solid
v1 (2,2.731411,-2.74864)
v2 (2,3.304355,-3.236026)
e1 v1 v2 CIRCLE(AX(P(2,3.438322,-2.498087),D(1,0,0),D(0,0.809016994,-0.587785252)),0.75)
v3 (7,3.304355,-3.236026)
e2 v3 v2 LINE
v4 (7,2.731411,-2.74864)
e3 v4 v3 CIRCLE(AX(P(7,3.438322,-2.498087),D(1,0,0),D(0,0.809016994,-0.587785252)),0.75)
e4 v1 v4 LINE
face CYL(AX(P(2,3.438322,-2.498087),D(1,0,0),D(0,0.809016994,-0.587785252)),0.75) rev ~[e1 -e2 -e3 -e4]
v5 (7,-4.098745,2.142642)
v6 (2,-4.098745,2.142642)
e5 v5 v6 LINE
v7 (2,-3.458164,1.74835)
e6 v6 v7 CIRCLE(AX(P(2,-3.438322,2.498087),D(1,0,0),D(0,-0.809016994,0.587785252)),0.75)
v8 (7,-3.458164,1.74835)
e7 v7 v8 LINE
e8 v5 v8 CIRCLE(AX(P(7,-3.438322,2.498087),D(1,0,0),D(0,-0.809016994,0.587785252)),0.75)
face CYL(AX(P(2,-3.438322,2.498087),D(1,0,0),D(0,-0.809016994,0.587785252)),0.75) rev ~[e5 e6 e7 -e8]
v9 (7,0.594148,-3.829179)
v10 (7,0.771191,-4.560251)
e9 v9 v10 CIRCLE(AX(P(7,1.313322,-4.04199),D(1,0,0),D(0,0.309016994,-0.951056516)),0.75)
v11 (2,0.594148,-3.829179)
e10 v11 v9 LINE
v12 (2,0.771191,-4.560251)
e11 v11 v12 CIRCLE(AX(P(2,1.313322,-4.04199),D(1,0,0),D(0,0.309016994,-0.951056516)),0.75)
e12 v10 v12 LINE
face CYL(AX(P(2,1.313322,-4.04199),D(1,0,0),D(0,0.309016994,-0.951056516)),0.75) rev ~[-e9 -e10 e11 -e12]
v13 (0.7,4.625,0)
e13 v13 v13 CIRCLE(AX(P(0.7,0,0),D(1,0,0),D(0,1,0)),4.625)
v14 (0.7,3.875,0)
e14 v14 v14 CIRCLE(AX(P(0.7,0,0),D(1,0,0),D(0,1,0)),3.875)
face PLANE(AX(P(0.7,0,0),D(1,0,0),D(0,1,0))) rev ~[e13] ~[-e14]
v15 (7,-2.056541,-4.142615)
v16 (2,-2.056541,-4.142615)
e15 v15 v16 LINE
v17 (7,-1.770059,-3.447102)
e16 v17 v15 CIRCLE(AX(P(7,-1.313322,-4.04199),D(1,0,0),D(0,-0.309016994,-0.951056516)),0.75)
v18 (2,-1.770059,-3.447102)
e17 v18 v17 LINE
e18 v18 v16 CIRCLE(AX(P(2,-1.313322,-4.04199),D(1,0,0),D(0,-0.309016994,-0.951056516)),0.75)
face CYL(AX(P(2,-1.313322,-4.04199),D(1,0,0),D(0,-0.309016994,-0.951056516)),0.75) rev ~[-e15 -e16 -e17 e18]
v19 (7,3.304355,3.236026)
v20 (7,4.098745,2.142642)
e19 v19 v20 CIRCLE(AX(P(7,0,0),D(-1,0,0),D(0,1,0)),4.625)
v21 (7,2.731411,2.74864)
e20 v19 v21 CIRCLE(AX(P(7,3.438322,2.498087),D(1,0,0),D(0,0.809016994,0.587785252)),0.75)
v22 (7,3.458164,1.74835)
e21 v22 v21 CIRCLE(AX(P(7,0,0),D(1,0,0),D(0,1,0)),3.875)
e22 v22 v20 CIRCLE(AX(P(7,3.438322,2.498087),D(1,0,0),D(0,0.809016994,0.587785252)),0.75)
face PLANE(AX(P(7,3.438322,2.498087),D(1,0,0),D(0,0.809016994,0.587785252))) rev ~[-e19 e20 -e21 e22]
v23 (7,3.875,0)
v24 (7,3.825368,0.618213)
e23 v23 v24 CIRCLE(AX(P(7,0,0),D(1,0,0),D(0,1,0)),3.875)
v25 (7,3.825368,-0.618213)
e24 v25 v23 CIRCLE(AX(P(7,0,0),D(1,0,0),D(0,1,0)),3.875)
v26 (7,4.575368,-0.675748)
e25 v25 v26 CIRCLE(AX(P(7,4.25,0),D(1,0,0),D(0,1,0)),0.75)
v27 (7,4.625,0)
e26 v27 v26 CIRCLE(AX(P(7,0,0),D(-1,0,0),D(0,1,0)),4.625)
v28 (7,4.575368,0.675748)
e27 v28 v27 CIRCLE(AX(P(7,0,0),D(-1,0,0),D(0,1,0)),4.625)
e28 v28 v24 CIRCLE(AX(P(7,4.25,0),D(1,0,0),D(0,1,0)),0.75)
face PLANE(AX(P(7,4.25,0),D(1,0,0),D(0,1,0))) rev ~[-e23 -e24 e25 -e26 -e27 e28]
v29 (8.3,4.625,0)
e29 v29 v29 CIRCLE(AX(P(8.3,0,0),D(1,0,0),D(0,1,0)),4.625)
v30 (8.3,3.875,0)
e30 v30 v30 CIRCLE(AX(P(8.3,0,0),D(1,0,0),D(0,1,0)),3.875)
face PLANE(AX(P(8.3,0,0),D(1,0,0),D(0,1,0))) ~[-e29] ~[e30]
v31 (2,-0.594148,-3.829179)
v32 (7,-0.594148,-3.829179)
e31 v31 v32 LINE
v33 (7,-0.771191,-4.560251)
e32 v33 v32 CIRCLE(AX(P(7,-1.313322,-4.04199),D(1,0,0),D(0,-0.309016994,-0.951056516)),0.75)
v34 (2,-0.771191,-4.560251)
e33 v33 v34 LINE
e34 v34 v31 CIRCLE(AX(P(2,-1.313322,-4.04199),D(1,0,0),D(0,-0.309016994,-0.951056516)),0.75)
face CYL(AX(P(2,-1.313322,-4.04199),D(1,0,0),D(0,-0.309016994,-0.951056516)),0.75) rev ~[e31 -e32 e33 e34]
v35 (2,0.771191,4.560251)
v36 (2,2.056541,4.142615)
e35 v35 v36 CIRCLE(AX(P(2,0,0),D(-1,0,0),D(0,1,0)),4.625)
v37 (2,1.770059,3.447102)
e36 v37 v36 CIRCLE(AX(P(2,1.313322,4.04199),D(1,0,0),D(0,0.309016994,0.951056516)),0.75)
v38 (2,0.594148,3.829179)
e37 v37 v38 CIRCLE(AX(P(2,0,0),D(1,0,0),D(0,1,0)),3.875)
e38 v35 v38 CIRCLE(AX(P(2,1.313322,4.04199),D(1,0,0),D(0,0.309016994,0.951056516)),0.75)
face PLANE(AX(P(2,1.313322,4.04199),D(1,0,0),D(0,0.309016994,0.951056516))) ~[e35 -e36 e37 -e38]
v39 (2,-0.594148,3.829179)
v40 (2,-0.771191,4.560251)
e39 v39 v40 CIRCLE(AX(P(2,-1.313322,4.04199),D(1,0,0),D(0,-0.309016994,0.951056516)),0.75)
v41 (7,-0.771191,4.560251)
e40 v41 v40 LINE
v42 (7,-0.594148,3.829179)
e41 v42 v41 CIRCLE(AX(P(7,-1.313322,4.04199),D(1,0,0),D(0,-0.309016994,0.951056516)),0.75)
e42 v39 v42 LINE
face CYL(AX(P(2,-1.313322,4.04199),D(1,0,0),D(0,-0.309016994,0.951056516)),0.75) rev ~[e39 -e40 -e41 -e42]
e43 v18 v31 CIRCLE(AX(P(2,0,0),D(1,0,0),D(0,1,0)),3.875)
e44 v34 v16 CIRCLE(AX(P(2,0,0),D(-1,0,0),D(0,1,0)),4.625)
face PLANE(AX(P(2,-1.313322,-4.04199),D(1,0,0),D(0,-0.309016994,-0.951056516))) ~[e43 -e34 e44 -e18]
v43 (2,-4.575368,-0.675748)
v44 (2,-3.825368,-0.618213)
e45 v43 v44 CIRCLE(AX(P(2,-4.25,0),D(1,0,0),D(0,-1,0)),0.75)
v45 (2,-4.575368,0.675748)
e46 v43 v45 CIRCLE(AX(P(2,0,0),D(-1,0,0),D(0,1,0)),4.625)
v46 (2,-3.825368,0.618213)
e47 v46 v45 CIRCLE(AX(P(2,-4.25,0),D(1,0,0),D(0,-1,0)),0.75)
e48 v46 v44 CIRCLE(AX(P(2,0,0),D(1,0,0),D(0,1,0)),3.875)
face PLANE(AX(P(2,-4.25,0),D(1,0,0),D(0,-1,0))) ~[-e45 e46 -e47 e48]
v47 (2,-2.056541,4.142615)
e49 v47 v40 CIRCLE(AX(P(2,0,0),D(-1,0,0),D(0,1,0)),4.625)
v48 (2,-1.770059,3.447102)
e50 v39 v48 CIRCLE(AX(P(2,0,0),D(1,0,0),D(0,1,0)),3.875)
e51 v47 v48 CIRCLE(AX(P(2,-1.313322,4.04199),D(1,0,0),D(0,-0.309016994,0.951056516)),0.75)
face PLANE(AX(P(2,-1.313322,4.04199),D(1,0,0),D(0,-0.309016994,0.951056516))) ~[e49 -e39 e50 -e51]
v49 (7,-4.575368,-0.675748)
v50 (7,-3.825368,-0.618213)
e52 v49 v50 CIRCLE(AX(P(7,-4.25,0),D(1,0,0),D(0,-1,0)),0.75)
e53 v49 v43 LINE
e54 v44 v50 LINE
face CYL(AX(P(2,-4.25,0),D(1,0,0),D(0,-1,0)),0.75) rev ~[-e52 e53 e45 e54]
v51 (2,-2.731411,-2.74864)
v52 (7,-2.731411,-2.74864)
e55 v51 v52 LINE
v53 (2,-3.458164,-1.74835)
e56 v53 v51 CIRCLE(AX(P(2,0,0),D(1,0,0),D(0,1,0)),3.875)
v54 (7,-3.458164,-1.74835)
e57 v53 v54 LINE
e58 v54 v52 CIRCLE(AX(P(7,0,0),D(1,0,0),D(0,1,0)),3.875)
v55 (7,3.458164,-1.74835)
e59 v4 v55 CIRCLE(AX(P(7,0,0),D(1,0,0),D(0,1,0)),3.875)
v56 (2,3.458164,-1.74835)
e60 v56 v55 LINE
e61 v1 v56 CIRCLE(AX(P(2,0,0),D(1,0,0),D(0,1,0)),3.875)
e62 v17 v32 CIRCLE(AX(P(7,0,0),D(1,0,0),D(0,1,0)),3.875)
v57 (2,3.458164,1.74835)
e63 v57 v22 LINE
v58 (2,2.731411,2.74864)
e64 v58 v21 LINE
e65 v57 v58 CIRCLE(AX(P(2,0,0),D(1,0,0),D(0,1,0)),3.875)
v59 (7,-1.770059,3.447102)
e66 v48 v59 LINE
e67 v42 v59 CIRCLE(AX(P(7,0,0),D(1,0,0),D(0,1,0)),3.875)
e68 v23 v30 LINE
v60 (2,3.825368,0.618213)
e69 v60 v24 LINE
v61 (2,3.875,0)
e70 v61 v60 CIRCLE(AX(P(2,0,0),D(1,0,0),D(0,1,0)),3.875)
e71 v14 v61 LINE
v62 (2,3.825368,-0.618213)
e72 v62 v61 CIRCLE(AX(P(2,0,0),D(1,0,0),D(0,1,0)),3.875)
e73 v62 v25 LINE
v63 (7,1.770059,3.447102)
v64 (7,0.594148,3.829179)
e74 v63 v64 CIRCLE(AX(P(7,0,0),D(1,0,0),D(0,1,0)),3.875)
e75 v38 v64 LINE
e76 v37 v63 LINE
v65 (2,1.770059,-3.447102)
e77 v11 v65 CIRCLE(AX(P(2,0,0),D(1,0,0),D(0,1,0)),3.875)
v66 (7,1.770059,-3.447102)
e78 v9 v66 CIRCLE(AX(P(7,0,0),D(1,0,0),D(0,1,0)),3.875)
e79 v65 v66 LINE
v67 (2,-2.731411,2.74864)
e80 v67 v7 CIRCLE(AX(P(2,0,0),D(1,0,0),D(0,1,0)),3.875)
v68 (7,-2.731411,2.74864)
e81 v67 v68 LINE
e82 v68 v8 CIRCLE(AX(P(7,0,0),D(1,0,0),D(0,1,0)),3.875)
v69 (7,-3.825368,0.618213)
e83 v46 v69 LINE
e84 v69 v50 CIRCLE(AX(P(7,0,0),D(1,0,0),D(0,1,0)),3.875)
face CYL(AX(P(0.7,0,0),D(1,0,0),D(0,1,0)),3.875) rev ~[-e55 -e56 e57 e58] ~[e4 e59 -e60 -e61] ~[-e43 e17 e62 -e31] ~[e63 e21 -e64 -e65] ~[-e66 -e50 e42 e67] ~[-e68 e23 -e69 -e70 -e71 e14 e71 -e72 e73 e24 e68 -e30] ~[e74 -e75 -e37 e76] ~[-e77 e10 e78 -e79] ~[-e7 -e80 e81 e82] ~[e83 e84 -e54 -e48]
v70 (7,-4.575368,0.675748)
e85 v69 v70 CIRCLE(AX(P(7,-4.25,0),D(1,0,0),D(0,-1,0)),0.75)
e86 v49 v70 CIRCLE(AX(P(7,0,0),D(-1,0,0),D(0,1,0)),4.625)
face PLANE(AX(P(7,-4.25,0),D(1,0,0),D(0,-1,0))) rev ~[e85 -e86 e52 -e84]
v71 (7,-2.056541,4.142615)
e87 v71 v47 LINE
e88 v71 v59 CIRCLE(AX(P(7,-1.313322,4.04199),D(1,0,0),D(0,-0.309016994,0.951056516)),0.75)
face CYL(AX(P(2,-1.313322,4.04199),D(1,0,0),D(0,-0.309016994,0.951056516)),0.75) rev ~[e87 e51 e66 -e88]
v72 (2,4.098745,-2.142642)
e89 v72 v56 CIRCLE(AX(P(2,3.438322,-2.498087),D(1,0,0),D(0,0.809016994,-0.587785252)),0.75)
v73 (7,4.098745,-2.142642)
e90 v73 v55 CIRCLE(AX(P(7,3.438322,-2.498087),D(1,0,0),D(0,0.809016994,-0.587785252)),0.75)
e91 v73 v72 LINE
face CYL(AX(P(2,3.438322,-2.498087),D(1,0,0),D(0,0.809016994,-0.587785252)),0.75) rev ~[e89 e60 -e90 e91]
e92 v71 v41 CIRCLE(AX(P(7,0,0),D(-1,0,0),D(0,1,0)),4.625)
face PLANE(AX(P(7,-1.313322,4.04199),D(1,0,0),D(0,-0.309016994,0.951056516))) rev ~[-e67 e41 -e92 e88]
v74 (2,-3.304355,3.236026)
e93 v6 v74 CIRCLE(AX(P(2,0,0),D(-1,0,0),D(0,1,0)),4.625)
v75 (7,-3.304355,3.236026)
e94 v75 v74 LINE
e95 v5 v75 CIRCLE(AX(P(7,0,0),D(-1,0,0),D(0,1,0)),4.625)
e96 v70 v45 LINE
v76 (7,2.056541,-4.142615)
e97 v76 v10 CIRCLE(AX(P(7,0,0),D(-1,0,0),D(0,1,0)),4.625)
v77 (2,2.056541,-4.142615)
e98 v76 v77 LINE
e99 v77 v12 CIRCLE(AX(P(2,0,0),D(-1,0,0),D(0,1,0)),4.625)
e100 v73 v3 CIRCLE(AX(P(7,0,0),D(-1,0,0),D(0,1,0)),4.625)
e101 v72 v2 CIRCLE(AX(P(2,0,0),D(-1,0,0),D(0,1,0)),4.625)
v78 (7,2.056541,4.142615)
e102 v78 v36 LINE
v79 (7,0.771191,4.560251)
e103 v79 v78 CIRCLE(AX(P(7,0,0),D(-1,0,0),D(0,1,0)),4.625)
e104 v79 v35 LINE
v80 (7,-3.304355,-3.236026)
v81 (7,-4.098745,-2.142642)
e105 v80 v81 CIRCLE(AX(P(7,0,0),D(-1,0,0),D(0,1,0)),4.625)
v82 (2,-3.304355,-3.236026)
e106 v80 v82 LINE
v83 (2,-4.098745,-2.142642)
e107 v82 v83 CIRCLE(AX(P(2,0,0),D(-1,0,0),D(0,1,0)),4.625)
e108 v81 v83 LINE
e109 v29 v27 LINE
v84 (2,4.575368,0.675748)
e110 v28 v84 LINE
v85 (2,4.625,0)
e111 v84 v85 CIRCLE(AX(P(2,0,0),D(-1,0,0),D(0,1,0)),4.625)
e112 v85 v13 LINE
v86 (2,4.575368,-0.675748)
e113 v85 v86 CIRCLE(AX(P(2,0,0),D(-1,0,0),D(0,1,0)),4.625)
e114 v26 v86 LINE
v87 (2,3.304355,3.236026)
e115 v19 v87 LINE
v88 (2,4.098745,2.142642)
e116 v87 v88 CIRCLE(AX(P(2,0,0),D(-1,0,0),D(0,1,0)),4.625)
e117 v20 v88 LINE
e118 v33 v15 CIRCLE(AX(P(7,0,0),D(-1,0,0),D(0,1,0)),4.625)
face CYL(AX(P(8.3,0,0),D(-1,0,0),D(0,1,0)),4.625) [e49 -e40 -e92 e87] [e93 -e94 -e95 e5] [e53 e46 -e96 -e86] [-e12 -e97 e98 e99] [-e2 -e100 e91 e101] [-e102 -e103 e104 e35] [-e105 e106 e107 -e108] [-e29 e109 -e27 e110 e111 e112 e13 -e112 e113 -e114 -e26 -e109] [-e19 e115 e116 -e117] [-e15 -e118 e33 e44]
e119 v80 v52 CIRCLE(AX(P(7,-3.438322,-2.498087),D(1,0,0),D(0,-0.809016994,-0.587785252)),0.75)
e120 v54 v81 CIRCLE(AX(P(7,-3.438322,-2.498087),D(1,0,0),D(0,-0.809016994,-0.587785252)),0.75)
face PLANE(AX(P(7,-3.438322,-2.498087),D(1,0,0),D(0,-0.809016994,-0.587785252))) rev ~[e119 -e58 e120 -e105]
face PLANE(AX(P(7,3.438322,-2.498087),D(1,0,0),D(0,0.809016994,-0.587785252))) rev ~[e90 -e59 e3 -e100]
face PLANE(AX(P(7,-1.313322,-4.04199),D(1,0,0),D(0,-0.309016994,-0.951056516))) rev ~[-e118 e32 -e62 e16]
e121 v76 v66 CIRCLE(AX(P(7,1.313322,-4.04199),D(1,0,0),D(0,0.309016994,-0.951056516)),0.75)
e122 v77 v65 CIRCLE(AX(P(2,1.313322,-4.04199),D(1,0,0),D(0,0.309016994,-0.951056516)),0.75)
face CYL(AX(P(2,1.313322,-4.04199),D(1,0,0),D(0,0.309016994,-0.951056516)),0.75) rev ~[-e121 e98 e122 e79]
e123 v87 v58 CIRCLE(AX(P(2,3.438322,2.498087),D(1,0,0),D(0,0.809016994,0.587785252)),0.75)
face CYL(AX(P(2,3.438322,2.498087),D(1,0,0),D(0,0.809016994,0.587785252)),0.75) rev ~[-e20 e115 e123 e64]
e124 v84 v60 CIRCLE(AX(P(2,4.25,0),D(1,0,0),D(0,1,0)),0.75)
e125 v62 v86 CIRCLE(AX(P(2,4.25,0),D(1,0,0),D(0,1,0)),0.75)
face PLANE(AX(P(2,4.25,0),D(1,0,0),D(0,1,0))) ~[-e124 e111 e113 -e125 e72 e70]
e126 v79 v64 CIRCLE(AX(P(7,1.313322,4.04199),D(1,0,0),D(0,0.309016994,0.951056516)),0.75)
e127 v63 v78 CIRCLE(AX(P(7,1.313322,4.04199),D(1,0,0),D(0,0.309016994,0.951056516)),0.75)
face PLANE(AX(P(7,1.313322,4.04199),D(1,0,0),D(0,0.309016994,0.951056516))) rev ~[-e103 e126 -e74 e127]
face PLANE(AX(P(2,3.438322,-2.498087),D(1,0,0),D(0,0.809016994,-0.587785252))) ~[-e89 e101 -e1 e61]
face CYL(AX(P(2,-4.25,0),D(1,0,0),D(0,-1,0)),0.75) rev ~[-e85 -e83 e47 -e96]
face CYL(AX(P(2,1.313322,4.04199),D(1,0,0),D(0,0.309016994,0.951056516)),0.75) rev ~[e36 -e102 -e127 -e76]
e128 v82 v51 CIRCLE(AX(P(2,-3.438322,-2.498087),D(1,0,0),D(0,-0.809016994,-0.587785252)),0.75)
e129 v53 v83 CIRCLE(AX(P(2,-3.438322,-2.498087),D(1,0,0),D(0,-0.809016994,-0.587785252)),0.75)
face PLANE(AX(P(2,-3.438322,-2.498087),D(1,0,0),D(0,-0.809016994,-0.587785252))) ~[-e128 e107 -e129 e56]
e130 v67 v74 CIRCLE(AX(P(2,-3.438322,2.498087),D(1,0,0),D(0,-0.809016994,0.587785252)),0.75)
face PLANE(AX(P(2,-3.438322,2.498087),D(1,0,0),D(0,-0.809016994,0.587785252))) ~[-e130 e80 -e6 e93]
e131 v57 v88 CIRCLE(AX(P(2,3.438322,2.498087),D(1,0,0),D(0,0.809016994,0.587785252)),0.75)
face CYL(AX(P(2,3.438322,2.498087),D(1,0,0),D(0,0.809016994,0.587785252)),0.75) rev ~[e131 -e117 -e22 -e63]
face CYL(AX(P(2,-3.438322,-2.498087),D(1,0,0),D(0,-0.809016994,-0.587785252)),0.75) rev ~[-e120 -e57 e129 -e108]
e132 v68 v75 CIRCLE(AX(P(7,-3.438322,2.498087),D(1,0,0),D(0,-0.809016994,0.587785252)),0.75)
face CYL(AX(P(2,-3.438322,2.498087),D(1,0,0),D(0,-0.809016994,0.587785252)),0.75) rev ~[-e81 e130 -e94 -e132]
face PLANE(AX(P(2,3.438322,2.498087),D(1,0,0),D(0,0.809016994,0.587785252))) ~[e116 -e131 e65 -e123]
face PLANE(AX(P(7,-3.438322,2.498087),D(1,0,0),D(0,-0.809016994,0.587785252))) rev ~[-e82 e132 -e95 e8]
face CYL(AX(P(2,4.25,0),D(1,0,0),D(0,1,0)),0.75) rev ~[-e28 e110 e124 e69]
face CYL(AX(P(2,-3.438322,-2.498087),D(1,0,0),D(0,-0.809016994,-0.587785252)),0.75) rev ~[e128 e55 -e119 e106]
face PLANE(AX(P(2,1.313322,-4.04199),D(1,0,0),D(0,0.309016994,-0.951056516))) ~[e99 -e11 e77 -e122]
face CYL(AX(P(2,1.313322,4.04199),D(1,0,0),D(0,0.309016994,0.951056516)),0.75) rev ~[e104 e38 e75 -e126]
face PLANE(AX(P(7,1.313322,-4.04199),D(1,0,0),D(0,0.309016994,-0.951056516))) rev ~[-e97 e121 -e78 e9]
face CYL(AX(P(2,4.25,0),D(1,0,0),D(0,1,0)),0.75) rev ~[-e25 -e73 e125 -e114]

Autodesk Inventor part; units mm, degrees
sketch "Sketch_1" plane through (0, 0, 0) normal (0, 0, 1) x (1, 0, 0)
  line L0 (8.3, 0) -> (0.7, 0)
  line L1 (0.7, 3.875) -> (8.3, 3.875)
  line L2 (8.3, 3.875) -> (8.3, 4.625)
  line L3 (8.3, 4.625) -> (0.7, 4.625)
  line L4 (0.7, 4.625) -> (0.7, 3.875)
revolve "Revolution1" add sketch "Sketch_1" angle 360 about axis through (8.3, 0, 0) along (1, 0, 0)
sketch "Sketch_2" plane through (0, 0, 0) normal (0, 0, 1) x (1, 0, 0)
  line L0 (7, 4.25) -> (2, 4.25)
  line L1 (2, 4.25) -> (2, 5)
  line L2 (2, 5) -> (7, 5)
  line L3 (7, 5) -> (7, 4.25)
  line L4 (7, 4.25) -> (2, 4.25)
revolve "Revolution2" cut sketch "Sketch_2" angle 360 about axis through (7, 4.25, 0) along (1, 0, 0)
pattern_circular "Circular Pattern1" count 10 over 360 about axis through (4.5, 0, 0) along (1, 0, 0) of "Revolution2"
ref_plane "IP_1_XY" through (4.5, 0, 0) normal (1, 0, 0) x (0, 0, -1)
ref_plane "IP_1_YZ" through (4.5, 0, 0) normal (0, 0, -1) x (0, 1, 0)
ref_plane "IP_1_ZX" through (4.5, 0, 0) normal (0, 1, 0) x (1, 0, 0)
ref_plane "IP_3_1_XY" through (4.5, 4.25, 0) normal (1, 0, 0) x (0, 0, -1)
ref_plane "IP_3_1_YZ" through (4.5, 4.25, 0) normal (0, 0, -1) x (0, 1, 0)
ref_plane "IP_3_1_ZX" through (4.5, 4.25, 0) normal (0, 1, 0) x (1, 0, 0)
ref_plane "IP_3_10_XY" through (4.5, 3.4383, -2.4981) normal (1, 0, 0) x (0, 0, -1)
ref_plane "IP_3_10_YZ" through (4.5, 3.4383, -2.4981) normal (0, 0, -1) x (0, 1, 0)
ref_plane "IP_3_10_ZX" through (4.5, 3.4383, -2.4981) normal (0, 1, 0) x (1, 0, 0)
ref_plane "IP_3_2_XY" through (4.5, 3.4383, 2.4981) normal (1, 0, 0) x (0, 0, -1)
ref_plane "IP_3_2_YZ" through (4.5, 3.4383, 2.4981) normal (0, 0, -1) x (0, 1, 0)
ref_plane "IP_3_2_ZX" through (4.5, 3.4383, 2.4981) normal (0, 1, 0) x (1, 0, 0)
ref_plane "IP_3_3_XY" through (4.5, 1.3133, 4.042) normal (1, 0, 0) x (0, 0, -1)
ref_plane "IP_3_3_YZ" through (4.5, 1.3133, 4.042) normal (0, 0, -1) x (0, 1, 0)
ref_plane "IP_3_3_ZX" through (4.5, 1.3133, 4.042) normal (0, 1, 0) x (1, 0, 0)
ref_plane "IP_3_4_XY" through (4.5, -1.3133, 4.042) normal (1, 0, 0) x (0, 0, -1)
ref_plane "IP_3_4_YZ" through (4.5, -1.3133, 4.042) normal (0, 0, -1) x (0, 1, 0)
ref_plane "IP_3_4_ZX" through (4.5, -1.3133, 4.042) normal (0, 1, 0) x (1, 0, 0)
ref_plane "IP_3_5_XY" through (4.5, -3.4383, 2.4981) normal (1, 0, 0) x (0, 0, -1)
ref_plane "IP_3_5_YZ" through (4.5, -3.4383, 2.4981) normal (0, 0, -1) x (0, 1, 0)
ref_plane "IP_3_5_ZX" through (4.5, -3.4383, 2.4981) normal (0, 1, 0) x (1, 0, 0)
ref_plane "IP_3_6_XY" through (4.5, -4.25, 0) normal (1, 0, 0) x (0, 0, -1)
ref_plane "IP_3_6_YZ" through (4.5, -4.25, 0) normal (0, 0, -1) x (0, 1, 0)
ref_plane "IP_3_6_ZX" through (4.5, -4.25, 0) normal (0, 1, 0) x (1, 0, 0)
ref_plane "IP_3_7_XY" through (4.5, -3.4383, -2.4981) normal (1, 0, 0) x (0, 0, -1)
ref_plane "IP_3_7_YZ" through (4.5, -3.4383, -2.4981) normal (0, 0, -1) x (0, 1, 0)
ref_plane "IP_3_7_ZX" through (4.5, -3.4383, -2.4981) normal (0, 1, 0) x (1, 0, 0)
ref_plane "IP_3_8_XY" through (4.5, -1.3133, -4.042) normal (1, 0, 0) x (0, 0, -1)
ref_plane "IP_3_8_YZ" through (4.5, -1.3133, -4.042) normal (0, 0, -1) x (0, 1, 0)
ref_plane "IP_3_8_ZX" through (4.5, -1.3133, -4.042) normal (0, 1, 0) x (1, 0, 0)
ref_plane "IP_3_9_XY" through (4.5, 1.3133, -4.042) normal (1, 0, 0) x (0, 0, -1)
ref_plane "IP_3_9_YZ" through (4.5, 1.3133, -4.042) normal (0, 0, -1) x (0, 1, 0)
ref_plane "IP_3_9_ZX" through (4.5, 1.3133, -4.042) normal (0, 1, 0) x (1, 0, 0)
properties part number "HK0709FMCA" material "Steel"
